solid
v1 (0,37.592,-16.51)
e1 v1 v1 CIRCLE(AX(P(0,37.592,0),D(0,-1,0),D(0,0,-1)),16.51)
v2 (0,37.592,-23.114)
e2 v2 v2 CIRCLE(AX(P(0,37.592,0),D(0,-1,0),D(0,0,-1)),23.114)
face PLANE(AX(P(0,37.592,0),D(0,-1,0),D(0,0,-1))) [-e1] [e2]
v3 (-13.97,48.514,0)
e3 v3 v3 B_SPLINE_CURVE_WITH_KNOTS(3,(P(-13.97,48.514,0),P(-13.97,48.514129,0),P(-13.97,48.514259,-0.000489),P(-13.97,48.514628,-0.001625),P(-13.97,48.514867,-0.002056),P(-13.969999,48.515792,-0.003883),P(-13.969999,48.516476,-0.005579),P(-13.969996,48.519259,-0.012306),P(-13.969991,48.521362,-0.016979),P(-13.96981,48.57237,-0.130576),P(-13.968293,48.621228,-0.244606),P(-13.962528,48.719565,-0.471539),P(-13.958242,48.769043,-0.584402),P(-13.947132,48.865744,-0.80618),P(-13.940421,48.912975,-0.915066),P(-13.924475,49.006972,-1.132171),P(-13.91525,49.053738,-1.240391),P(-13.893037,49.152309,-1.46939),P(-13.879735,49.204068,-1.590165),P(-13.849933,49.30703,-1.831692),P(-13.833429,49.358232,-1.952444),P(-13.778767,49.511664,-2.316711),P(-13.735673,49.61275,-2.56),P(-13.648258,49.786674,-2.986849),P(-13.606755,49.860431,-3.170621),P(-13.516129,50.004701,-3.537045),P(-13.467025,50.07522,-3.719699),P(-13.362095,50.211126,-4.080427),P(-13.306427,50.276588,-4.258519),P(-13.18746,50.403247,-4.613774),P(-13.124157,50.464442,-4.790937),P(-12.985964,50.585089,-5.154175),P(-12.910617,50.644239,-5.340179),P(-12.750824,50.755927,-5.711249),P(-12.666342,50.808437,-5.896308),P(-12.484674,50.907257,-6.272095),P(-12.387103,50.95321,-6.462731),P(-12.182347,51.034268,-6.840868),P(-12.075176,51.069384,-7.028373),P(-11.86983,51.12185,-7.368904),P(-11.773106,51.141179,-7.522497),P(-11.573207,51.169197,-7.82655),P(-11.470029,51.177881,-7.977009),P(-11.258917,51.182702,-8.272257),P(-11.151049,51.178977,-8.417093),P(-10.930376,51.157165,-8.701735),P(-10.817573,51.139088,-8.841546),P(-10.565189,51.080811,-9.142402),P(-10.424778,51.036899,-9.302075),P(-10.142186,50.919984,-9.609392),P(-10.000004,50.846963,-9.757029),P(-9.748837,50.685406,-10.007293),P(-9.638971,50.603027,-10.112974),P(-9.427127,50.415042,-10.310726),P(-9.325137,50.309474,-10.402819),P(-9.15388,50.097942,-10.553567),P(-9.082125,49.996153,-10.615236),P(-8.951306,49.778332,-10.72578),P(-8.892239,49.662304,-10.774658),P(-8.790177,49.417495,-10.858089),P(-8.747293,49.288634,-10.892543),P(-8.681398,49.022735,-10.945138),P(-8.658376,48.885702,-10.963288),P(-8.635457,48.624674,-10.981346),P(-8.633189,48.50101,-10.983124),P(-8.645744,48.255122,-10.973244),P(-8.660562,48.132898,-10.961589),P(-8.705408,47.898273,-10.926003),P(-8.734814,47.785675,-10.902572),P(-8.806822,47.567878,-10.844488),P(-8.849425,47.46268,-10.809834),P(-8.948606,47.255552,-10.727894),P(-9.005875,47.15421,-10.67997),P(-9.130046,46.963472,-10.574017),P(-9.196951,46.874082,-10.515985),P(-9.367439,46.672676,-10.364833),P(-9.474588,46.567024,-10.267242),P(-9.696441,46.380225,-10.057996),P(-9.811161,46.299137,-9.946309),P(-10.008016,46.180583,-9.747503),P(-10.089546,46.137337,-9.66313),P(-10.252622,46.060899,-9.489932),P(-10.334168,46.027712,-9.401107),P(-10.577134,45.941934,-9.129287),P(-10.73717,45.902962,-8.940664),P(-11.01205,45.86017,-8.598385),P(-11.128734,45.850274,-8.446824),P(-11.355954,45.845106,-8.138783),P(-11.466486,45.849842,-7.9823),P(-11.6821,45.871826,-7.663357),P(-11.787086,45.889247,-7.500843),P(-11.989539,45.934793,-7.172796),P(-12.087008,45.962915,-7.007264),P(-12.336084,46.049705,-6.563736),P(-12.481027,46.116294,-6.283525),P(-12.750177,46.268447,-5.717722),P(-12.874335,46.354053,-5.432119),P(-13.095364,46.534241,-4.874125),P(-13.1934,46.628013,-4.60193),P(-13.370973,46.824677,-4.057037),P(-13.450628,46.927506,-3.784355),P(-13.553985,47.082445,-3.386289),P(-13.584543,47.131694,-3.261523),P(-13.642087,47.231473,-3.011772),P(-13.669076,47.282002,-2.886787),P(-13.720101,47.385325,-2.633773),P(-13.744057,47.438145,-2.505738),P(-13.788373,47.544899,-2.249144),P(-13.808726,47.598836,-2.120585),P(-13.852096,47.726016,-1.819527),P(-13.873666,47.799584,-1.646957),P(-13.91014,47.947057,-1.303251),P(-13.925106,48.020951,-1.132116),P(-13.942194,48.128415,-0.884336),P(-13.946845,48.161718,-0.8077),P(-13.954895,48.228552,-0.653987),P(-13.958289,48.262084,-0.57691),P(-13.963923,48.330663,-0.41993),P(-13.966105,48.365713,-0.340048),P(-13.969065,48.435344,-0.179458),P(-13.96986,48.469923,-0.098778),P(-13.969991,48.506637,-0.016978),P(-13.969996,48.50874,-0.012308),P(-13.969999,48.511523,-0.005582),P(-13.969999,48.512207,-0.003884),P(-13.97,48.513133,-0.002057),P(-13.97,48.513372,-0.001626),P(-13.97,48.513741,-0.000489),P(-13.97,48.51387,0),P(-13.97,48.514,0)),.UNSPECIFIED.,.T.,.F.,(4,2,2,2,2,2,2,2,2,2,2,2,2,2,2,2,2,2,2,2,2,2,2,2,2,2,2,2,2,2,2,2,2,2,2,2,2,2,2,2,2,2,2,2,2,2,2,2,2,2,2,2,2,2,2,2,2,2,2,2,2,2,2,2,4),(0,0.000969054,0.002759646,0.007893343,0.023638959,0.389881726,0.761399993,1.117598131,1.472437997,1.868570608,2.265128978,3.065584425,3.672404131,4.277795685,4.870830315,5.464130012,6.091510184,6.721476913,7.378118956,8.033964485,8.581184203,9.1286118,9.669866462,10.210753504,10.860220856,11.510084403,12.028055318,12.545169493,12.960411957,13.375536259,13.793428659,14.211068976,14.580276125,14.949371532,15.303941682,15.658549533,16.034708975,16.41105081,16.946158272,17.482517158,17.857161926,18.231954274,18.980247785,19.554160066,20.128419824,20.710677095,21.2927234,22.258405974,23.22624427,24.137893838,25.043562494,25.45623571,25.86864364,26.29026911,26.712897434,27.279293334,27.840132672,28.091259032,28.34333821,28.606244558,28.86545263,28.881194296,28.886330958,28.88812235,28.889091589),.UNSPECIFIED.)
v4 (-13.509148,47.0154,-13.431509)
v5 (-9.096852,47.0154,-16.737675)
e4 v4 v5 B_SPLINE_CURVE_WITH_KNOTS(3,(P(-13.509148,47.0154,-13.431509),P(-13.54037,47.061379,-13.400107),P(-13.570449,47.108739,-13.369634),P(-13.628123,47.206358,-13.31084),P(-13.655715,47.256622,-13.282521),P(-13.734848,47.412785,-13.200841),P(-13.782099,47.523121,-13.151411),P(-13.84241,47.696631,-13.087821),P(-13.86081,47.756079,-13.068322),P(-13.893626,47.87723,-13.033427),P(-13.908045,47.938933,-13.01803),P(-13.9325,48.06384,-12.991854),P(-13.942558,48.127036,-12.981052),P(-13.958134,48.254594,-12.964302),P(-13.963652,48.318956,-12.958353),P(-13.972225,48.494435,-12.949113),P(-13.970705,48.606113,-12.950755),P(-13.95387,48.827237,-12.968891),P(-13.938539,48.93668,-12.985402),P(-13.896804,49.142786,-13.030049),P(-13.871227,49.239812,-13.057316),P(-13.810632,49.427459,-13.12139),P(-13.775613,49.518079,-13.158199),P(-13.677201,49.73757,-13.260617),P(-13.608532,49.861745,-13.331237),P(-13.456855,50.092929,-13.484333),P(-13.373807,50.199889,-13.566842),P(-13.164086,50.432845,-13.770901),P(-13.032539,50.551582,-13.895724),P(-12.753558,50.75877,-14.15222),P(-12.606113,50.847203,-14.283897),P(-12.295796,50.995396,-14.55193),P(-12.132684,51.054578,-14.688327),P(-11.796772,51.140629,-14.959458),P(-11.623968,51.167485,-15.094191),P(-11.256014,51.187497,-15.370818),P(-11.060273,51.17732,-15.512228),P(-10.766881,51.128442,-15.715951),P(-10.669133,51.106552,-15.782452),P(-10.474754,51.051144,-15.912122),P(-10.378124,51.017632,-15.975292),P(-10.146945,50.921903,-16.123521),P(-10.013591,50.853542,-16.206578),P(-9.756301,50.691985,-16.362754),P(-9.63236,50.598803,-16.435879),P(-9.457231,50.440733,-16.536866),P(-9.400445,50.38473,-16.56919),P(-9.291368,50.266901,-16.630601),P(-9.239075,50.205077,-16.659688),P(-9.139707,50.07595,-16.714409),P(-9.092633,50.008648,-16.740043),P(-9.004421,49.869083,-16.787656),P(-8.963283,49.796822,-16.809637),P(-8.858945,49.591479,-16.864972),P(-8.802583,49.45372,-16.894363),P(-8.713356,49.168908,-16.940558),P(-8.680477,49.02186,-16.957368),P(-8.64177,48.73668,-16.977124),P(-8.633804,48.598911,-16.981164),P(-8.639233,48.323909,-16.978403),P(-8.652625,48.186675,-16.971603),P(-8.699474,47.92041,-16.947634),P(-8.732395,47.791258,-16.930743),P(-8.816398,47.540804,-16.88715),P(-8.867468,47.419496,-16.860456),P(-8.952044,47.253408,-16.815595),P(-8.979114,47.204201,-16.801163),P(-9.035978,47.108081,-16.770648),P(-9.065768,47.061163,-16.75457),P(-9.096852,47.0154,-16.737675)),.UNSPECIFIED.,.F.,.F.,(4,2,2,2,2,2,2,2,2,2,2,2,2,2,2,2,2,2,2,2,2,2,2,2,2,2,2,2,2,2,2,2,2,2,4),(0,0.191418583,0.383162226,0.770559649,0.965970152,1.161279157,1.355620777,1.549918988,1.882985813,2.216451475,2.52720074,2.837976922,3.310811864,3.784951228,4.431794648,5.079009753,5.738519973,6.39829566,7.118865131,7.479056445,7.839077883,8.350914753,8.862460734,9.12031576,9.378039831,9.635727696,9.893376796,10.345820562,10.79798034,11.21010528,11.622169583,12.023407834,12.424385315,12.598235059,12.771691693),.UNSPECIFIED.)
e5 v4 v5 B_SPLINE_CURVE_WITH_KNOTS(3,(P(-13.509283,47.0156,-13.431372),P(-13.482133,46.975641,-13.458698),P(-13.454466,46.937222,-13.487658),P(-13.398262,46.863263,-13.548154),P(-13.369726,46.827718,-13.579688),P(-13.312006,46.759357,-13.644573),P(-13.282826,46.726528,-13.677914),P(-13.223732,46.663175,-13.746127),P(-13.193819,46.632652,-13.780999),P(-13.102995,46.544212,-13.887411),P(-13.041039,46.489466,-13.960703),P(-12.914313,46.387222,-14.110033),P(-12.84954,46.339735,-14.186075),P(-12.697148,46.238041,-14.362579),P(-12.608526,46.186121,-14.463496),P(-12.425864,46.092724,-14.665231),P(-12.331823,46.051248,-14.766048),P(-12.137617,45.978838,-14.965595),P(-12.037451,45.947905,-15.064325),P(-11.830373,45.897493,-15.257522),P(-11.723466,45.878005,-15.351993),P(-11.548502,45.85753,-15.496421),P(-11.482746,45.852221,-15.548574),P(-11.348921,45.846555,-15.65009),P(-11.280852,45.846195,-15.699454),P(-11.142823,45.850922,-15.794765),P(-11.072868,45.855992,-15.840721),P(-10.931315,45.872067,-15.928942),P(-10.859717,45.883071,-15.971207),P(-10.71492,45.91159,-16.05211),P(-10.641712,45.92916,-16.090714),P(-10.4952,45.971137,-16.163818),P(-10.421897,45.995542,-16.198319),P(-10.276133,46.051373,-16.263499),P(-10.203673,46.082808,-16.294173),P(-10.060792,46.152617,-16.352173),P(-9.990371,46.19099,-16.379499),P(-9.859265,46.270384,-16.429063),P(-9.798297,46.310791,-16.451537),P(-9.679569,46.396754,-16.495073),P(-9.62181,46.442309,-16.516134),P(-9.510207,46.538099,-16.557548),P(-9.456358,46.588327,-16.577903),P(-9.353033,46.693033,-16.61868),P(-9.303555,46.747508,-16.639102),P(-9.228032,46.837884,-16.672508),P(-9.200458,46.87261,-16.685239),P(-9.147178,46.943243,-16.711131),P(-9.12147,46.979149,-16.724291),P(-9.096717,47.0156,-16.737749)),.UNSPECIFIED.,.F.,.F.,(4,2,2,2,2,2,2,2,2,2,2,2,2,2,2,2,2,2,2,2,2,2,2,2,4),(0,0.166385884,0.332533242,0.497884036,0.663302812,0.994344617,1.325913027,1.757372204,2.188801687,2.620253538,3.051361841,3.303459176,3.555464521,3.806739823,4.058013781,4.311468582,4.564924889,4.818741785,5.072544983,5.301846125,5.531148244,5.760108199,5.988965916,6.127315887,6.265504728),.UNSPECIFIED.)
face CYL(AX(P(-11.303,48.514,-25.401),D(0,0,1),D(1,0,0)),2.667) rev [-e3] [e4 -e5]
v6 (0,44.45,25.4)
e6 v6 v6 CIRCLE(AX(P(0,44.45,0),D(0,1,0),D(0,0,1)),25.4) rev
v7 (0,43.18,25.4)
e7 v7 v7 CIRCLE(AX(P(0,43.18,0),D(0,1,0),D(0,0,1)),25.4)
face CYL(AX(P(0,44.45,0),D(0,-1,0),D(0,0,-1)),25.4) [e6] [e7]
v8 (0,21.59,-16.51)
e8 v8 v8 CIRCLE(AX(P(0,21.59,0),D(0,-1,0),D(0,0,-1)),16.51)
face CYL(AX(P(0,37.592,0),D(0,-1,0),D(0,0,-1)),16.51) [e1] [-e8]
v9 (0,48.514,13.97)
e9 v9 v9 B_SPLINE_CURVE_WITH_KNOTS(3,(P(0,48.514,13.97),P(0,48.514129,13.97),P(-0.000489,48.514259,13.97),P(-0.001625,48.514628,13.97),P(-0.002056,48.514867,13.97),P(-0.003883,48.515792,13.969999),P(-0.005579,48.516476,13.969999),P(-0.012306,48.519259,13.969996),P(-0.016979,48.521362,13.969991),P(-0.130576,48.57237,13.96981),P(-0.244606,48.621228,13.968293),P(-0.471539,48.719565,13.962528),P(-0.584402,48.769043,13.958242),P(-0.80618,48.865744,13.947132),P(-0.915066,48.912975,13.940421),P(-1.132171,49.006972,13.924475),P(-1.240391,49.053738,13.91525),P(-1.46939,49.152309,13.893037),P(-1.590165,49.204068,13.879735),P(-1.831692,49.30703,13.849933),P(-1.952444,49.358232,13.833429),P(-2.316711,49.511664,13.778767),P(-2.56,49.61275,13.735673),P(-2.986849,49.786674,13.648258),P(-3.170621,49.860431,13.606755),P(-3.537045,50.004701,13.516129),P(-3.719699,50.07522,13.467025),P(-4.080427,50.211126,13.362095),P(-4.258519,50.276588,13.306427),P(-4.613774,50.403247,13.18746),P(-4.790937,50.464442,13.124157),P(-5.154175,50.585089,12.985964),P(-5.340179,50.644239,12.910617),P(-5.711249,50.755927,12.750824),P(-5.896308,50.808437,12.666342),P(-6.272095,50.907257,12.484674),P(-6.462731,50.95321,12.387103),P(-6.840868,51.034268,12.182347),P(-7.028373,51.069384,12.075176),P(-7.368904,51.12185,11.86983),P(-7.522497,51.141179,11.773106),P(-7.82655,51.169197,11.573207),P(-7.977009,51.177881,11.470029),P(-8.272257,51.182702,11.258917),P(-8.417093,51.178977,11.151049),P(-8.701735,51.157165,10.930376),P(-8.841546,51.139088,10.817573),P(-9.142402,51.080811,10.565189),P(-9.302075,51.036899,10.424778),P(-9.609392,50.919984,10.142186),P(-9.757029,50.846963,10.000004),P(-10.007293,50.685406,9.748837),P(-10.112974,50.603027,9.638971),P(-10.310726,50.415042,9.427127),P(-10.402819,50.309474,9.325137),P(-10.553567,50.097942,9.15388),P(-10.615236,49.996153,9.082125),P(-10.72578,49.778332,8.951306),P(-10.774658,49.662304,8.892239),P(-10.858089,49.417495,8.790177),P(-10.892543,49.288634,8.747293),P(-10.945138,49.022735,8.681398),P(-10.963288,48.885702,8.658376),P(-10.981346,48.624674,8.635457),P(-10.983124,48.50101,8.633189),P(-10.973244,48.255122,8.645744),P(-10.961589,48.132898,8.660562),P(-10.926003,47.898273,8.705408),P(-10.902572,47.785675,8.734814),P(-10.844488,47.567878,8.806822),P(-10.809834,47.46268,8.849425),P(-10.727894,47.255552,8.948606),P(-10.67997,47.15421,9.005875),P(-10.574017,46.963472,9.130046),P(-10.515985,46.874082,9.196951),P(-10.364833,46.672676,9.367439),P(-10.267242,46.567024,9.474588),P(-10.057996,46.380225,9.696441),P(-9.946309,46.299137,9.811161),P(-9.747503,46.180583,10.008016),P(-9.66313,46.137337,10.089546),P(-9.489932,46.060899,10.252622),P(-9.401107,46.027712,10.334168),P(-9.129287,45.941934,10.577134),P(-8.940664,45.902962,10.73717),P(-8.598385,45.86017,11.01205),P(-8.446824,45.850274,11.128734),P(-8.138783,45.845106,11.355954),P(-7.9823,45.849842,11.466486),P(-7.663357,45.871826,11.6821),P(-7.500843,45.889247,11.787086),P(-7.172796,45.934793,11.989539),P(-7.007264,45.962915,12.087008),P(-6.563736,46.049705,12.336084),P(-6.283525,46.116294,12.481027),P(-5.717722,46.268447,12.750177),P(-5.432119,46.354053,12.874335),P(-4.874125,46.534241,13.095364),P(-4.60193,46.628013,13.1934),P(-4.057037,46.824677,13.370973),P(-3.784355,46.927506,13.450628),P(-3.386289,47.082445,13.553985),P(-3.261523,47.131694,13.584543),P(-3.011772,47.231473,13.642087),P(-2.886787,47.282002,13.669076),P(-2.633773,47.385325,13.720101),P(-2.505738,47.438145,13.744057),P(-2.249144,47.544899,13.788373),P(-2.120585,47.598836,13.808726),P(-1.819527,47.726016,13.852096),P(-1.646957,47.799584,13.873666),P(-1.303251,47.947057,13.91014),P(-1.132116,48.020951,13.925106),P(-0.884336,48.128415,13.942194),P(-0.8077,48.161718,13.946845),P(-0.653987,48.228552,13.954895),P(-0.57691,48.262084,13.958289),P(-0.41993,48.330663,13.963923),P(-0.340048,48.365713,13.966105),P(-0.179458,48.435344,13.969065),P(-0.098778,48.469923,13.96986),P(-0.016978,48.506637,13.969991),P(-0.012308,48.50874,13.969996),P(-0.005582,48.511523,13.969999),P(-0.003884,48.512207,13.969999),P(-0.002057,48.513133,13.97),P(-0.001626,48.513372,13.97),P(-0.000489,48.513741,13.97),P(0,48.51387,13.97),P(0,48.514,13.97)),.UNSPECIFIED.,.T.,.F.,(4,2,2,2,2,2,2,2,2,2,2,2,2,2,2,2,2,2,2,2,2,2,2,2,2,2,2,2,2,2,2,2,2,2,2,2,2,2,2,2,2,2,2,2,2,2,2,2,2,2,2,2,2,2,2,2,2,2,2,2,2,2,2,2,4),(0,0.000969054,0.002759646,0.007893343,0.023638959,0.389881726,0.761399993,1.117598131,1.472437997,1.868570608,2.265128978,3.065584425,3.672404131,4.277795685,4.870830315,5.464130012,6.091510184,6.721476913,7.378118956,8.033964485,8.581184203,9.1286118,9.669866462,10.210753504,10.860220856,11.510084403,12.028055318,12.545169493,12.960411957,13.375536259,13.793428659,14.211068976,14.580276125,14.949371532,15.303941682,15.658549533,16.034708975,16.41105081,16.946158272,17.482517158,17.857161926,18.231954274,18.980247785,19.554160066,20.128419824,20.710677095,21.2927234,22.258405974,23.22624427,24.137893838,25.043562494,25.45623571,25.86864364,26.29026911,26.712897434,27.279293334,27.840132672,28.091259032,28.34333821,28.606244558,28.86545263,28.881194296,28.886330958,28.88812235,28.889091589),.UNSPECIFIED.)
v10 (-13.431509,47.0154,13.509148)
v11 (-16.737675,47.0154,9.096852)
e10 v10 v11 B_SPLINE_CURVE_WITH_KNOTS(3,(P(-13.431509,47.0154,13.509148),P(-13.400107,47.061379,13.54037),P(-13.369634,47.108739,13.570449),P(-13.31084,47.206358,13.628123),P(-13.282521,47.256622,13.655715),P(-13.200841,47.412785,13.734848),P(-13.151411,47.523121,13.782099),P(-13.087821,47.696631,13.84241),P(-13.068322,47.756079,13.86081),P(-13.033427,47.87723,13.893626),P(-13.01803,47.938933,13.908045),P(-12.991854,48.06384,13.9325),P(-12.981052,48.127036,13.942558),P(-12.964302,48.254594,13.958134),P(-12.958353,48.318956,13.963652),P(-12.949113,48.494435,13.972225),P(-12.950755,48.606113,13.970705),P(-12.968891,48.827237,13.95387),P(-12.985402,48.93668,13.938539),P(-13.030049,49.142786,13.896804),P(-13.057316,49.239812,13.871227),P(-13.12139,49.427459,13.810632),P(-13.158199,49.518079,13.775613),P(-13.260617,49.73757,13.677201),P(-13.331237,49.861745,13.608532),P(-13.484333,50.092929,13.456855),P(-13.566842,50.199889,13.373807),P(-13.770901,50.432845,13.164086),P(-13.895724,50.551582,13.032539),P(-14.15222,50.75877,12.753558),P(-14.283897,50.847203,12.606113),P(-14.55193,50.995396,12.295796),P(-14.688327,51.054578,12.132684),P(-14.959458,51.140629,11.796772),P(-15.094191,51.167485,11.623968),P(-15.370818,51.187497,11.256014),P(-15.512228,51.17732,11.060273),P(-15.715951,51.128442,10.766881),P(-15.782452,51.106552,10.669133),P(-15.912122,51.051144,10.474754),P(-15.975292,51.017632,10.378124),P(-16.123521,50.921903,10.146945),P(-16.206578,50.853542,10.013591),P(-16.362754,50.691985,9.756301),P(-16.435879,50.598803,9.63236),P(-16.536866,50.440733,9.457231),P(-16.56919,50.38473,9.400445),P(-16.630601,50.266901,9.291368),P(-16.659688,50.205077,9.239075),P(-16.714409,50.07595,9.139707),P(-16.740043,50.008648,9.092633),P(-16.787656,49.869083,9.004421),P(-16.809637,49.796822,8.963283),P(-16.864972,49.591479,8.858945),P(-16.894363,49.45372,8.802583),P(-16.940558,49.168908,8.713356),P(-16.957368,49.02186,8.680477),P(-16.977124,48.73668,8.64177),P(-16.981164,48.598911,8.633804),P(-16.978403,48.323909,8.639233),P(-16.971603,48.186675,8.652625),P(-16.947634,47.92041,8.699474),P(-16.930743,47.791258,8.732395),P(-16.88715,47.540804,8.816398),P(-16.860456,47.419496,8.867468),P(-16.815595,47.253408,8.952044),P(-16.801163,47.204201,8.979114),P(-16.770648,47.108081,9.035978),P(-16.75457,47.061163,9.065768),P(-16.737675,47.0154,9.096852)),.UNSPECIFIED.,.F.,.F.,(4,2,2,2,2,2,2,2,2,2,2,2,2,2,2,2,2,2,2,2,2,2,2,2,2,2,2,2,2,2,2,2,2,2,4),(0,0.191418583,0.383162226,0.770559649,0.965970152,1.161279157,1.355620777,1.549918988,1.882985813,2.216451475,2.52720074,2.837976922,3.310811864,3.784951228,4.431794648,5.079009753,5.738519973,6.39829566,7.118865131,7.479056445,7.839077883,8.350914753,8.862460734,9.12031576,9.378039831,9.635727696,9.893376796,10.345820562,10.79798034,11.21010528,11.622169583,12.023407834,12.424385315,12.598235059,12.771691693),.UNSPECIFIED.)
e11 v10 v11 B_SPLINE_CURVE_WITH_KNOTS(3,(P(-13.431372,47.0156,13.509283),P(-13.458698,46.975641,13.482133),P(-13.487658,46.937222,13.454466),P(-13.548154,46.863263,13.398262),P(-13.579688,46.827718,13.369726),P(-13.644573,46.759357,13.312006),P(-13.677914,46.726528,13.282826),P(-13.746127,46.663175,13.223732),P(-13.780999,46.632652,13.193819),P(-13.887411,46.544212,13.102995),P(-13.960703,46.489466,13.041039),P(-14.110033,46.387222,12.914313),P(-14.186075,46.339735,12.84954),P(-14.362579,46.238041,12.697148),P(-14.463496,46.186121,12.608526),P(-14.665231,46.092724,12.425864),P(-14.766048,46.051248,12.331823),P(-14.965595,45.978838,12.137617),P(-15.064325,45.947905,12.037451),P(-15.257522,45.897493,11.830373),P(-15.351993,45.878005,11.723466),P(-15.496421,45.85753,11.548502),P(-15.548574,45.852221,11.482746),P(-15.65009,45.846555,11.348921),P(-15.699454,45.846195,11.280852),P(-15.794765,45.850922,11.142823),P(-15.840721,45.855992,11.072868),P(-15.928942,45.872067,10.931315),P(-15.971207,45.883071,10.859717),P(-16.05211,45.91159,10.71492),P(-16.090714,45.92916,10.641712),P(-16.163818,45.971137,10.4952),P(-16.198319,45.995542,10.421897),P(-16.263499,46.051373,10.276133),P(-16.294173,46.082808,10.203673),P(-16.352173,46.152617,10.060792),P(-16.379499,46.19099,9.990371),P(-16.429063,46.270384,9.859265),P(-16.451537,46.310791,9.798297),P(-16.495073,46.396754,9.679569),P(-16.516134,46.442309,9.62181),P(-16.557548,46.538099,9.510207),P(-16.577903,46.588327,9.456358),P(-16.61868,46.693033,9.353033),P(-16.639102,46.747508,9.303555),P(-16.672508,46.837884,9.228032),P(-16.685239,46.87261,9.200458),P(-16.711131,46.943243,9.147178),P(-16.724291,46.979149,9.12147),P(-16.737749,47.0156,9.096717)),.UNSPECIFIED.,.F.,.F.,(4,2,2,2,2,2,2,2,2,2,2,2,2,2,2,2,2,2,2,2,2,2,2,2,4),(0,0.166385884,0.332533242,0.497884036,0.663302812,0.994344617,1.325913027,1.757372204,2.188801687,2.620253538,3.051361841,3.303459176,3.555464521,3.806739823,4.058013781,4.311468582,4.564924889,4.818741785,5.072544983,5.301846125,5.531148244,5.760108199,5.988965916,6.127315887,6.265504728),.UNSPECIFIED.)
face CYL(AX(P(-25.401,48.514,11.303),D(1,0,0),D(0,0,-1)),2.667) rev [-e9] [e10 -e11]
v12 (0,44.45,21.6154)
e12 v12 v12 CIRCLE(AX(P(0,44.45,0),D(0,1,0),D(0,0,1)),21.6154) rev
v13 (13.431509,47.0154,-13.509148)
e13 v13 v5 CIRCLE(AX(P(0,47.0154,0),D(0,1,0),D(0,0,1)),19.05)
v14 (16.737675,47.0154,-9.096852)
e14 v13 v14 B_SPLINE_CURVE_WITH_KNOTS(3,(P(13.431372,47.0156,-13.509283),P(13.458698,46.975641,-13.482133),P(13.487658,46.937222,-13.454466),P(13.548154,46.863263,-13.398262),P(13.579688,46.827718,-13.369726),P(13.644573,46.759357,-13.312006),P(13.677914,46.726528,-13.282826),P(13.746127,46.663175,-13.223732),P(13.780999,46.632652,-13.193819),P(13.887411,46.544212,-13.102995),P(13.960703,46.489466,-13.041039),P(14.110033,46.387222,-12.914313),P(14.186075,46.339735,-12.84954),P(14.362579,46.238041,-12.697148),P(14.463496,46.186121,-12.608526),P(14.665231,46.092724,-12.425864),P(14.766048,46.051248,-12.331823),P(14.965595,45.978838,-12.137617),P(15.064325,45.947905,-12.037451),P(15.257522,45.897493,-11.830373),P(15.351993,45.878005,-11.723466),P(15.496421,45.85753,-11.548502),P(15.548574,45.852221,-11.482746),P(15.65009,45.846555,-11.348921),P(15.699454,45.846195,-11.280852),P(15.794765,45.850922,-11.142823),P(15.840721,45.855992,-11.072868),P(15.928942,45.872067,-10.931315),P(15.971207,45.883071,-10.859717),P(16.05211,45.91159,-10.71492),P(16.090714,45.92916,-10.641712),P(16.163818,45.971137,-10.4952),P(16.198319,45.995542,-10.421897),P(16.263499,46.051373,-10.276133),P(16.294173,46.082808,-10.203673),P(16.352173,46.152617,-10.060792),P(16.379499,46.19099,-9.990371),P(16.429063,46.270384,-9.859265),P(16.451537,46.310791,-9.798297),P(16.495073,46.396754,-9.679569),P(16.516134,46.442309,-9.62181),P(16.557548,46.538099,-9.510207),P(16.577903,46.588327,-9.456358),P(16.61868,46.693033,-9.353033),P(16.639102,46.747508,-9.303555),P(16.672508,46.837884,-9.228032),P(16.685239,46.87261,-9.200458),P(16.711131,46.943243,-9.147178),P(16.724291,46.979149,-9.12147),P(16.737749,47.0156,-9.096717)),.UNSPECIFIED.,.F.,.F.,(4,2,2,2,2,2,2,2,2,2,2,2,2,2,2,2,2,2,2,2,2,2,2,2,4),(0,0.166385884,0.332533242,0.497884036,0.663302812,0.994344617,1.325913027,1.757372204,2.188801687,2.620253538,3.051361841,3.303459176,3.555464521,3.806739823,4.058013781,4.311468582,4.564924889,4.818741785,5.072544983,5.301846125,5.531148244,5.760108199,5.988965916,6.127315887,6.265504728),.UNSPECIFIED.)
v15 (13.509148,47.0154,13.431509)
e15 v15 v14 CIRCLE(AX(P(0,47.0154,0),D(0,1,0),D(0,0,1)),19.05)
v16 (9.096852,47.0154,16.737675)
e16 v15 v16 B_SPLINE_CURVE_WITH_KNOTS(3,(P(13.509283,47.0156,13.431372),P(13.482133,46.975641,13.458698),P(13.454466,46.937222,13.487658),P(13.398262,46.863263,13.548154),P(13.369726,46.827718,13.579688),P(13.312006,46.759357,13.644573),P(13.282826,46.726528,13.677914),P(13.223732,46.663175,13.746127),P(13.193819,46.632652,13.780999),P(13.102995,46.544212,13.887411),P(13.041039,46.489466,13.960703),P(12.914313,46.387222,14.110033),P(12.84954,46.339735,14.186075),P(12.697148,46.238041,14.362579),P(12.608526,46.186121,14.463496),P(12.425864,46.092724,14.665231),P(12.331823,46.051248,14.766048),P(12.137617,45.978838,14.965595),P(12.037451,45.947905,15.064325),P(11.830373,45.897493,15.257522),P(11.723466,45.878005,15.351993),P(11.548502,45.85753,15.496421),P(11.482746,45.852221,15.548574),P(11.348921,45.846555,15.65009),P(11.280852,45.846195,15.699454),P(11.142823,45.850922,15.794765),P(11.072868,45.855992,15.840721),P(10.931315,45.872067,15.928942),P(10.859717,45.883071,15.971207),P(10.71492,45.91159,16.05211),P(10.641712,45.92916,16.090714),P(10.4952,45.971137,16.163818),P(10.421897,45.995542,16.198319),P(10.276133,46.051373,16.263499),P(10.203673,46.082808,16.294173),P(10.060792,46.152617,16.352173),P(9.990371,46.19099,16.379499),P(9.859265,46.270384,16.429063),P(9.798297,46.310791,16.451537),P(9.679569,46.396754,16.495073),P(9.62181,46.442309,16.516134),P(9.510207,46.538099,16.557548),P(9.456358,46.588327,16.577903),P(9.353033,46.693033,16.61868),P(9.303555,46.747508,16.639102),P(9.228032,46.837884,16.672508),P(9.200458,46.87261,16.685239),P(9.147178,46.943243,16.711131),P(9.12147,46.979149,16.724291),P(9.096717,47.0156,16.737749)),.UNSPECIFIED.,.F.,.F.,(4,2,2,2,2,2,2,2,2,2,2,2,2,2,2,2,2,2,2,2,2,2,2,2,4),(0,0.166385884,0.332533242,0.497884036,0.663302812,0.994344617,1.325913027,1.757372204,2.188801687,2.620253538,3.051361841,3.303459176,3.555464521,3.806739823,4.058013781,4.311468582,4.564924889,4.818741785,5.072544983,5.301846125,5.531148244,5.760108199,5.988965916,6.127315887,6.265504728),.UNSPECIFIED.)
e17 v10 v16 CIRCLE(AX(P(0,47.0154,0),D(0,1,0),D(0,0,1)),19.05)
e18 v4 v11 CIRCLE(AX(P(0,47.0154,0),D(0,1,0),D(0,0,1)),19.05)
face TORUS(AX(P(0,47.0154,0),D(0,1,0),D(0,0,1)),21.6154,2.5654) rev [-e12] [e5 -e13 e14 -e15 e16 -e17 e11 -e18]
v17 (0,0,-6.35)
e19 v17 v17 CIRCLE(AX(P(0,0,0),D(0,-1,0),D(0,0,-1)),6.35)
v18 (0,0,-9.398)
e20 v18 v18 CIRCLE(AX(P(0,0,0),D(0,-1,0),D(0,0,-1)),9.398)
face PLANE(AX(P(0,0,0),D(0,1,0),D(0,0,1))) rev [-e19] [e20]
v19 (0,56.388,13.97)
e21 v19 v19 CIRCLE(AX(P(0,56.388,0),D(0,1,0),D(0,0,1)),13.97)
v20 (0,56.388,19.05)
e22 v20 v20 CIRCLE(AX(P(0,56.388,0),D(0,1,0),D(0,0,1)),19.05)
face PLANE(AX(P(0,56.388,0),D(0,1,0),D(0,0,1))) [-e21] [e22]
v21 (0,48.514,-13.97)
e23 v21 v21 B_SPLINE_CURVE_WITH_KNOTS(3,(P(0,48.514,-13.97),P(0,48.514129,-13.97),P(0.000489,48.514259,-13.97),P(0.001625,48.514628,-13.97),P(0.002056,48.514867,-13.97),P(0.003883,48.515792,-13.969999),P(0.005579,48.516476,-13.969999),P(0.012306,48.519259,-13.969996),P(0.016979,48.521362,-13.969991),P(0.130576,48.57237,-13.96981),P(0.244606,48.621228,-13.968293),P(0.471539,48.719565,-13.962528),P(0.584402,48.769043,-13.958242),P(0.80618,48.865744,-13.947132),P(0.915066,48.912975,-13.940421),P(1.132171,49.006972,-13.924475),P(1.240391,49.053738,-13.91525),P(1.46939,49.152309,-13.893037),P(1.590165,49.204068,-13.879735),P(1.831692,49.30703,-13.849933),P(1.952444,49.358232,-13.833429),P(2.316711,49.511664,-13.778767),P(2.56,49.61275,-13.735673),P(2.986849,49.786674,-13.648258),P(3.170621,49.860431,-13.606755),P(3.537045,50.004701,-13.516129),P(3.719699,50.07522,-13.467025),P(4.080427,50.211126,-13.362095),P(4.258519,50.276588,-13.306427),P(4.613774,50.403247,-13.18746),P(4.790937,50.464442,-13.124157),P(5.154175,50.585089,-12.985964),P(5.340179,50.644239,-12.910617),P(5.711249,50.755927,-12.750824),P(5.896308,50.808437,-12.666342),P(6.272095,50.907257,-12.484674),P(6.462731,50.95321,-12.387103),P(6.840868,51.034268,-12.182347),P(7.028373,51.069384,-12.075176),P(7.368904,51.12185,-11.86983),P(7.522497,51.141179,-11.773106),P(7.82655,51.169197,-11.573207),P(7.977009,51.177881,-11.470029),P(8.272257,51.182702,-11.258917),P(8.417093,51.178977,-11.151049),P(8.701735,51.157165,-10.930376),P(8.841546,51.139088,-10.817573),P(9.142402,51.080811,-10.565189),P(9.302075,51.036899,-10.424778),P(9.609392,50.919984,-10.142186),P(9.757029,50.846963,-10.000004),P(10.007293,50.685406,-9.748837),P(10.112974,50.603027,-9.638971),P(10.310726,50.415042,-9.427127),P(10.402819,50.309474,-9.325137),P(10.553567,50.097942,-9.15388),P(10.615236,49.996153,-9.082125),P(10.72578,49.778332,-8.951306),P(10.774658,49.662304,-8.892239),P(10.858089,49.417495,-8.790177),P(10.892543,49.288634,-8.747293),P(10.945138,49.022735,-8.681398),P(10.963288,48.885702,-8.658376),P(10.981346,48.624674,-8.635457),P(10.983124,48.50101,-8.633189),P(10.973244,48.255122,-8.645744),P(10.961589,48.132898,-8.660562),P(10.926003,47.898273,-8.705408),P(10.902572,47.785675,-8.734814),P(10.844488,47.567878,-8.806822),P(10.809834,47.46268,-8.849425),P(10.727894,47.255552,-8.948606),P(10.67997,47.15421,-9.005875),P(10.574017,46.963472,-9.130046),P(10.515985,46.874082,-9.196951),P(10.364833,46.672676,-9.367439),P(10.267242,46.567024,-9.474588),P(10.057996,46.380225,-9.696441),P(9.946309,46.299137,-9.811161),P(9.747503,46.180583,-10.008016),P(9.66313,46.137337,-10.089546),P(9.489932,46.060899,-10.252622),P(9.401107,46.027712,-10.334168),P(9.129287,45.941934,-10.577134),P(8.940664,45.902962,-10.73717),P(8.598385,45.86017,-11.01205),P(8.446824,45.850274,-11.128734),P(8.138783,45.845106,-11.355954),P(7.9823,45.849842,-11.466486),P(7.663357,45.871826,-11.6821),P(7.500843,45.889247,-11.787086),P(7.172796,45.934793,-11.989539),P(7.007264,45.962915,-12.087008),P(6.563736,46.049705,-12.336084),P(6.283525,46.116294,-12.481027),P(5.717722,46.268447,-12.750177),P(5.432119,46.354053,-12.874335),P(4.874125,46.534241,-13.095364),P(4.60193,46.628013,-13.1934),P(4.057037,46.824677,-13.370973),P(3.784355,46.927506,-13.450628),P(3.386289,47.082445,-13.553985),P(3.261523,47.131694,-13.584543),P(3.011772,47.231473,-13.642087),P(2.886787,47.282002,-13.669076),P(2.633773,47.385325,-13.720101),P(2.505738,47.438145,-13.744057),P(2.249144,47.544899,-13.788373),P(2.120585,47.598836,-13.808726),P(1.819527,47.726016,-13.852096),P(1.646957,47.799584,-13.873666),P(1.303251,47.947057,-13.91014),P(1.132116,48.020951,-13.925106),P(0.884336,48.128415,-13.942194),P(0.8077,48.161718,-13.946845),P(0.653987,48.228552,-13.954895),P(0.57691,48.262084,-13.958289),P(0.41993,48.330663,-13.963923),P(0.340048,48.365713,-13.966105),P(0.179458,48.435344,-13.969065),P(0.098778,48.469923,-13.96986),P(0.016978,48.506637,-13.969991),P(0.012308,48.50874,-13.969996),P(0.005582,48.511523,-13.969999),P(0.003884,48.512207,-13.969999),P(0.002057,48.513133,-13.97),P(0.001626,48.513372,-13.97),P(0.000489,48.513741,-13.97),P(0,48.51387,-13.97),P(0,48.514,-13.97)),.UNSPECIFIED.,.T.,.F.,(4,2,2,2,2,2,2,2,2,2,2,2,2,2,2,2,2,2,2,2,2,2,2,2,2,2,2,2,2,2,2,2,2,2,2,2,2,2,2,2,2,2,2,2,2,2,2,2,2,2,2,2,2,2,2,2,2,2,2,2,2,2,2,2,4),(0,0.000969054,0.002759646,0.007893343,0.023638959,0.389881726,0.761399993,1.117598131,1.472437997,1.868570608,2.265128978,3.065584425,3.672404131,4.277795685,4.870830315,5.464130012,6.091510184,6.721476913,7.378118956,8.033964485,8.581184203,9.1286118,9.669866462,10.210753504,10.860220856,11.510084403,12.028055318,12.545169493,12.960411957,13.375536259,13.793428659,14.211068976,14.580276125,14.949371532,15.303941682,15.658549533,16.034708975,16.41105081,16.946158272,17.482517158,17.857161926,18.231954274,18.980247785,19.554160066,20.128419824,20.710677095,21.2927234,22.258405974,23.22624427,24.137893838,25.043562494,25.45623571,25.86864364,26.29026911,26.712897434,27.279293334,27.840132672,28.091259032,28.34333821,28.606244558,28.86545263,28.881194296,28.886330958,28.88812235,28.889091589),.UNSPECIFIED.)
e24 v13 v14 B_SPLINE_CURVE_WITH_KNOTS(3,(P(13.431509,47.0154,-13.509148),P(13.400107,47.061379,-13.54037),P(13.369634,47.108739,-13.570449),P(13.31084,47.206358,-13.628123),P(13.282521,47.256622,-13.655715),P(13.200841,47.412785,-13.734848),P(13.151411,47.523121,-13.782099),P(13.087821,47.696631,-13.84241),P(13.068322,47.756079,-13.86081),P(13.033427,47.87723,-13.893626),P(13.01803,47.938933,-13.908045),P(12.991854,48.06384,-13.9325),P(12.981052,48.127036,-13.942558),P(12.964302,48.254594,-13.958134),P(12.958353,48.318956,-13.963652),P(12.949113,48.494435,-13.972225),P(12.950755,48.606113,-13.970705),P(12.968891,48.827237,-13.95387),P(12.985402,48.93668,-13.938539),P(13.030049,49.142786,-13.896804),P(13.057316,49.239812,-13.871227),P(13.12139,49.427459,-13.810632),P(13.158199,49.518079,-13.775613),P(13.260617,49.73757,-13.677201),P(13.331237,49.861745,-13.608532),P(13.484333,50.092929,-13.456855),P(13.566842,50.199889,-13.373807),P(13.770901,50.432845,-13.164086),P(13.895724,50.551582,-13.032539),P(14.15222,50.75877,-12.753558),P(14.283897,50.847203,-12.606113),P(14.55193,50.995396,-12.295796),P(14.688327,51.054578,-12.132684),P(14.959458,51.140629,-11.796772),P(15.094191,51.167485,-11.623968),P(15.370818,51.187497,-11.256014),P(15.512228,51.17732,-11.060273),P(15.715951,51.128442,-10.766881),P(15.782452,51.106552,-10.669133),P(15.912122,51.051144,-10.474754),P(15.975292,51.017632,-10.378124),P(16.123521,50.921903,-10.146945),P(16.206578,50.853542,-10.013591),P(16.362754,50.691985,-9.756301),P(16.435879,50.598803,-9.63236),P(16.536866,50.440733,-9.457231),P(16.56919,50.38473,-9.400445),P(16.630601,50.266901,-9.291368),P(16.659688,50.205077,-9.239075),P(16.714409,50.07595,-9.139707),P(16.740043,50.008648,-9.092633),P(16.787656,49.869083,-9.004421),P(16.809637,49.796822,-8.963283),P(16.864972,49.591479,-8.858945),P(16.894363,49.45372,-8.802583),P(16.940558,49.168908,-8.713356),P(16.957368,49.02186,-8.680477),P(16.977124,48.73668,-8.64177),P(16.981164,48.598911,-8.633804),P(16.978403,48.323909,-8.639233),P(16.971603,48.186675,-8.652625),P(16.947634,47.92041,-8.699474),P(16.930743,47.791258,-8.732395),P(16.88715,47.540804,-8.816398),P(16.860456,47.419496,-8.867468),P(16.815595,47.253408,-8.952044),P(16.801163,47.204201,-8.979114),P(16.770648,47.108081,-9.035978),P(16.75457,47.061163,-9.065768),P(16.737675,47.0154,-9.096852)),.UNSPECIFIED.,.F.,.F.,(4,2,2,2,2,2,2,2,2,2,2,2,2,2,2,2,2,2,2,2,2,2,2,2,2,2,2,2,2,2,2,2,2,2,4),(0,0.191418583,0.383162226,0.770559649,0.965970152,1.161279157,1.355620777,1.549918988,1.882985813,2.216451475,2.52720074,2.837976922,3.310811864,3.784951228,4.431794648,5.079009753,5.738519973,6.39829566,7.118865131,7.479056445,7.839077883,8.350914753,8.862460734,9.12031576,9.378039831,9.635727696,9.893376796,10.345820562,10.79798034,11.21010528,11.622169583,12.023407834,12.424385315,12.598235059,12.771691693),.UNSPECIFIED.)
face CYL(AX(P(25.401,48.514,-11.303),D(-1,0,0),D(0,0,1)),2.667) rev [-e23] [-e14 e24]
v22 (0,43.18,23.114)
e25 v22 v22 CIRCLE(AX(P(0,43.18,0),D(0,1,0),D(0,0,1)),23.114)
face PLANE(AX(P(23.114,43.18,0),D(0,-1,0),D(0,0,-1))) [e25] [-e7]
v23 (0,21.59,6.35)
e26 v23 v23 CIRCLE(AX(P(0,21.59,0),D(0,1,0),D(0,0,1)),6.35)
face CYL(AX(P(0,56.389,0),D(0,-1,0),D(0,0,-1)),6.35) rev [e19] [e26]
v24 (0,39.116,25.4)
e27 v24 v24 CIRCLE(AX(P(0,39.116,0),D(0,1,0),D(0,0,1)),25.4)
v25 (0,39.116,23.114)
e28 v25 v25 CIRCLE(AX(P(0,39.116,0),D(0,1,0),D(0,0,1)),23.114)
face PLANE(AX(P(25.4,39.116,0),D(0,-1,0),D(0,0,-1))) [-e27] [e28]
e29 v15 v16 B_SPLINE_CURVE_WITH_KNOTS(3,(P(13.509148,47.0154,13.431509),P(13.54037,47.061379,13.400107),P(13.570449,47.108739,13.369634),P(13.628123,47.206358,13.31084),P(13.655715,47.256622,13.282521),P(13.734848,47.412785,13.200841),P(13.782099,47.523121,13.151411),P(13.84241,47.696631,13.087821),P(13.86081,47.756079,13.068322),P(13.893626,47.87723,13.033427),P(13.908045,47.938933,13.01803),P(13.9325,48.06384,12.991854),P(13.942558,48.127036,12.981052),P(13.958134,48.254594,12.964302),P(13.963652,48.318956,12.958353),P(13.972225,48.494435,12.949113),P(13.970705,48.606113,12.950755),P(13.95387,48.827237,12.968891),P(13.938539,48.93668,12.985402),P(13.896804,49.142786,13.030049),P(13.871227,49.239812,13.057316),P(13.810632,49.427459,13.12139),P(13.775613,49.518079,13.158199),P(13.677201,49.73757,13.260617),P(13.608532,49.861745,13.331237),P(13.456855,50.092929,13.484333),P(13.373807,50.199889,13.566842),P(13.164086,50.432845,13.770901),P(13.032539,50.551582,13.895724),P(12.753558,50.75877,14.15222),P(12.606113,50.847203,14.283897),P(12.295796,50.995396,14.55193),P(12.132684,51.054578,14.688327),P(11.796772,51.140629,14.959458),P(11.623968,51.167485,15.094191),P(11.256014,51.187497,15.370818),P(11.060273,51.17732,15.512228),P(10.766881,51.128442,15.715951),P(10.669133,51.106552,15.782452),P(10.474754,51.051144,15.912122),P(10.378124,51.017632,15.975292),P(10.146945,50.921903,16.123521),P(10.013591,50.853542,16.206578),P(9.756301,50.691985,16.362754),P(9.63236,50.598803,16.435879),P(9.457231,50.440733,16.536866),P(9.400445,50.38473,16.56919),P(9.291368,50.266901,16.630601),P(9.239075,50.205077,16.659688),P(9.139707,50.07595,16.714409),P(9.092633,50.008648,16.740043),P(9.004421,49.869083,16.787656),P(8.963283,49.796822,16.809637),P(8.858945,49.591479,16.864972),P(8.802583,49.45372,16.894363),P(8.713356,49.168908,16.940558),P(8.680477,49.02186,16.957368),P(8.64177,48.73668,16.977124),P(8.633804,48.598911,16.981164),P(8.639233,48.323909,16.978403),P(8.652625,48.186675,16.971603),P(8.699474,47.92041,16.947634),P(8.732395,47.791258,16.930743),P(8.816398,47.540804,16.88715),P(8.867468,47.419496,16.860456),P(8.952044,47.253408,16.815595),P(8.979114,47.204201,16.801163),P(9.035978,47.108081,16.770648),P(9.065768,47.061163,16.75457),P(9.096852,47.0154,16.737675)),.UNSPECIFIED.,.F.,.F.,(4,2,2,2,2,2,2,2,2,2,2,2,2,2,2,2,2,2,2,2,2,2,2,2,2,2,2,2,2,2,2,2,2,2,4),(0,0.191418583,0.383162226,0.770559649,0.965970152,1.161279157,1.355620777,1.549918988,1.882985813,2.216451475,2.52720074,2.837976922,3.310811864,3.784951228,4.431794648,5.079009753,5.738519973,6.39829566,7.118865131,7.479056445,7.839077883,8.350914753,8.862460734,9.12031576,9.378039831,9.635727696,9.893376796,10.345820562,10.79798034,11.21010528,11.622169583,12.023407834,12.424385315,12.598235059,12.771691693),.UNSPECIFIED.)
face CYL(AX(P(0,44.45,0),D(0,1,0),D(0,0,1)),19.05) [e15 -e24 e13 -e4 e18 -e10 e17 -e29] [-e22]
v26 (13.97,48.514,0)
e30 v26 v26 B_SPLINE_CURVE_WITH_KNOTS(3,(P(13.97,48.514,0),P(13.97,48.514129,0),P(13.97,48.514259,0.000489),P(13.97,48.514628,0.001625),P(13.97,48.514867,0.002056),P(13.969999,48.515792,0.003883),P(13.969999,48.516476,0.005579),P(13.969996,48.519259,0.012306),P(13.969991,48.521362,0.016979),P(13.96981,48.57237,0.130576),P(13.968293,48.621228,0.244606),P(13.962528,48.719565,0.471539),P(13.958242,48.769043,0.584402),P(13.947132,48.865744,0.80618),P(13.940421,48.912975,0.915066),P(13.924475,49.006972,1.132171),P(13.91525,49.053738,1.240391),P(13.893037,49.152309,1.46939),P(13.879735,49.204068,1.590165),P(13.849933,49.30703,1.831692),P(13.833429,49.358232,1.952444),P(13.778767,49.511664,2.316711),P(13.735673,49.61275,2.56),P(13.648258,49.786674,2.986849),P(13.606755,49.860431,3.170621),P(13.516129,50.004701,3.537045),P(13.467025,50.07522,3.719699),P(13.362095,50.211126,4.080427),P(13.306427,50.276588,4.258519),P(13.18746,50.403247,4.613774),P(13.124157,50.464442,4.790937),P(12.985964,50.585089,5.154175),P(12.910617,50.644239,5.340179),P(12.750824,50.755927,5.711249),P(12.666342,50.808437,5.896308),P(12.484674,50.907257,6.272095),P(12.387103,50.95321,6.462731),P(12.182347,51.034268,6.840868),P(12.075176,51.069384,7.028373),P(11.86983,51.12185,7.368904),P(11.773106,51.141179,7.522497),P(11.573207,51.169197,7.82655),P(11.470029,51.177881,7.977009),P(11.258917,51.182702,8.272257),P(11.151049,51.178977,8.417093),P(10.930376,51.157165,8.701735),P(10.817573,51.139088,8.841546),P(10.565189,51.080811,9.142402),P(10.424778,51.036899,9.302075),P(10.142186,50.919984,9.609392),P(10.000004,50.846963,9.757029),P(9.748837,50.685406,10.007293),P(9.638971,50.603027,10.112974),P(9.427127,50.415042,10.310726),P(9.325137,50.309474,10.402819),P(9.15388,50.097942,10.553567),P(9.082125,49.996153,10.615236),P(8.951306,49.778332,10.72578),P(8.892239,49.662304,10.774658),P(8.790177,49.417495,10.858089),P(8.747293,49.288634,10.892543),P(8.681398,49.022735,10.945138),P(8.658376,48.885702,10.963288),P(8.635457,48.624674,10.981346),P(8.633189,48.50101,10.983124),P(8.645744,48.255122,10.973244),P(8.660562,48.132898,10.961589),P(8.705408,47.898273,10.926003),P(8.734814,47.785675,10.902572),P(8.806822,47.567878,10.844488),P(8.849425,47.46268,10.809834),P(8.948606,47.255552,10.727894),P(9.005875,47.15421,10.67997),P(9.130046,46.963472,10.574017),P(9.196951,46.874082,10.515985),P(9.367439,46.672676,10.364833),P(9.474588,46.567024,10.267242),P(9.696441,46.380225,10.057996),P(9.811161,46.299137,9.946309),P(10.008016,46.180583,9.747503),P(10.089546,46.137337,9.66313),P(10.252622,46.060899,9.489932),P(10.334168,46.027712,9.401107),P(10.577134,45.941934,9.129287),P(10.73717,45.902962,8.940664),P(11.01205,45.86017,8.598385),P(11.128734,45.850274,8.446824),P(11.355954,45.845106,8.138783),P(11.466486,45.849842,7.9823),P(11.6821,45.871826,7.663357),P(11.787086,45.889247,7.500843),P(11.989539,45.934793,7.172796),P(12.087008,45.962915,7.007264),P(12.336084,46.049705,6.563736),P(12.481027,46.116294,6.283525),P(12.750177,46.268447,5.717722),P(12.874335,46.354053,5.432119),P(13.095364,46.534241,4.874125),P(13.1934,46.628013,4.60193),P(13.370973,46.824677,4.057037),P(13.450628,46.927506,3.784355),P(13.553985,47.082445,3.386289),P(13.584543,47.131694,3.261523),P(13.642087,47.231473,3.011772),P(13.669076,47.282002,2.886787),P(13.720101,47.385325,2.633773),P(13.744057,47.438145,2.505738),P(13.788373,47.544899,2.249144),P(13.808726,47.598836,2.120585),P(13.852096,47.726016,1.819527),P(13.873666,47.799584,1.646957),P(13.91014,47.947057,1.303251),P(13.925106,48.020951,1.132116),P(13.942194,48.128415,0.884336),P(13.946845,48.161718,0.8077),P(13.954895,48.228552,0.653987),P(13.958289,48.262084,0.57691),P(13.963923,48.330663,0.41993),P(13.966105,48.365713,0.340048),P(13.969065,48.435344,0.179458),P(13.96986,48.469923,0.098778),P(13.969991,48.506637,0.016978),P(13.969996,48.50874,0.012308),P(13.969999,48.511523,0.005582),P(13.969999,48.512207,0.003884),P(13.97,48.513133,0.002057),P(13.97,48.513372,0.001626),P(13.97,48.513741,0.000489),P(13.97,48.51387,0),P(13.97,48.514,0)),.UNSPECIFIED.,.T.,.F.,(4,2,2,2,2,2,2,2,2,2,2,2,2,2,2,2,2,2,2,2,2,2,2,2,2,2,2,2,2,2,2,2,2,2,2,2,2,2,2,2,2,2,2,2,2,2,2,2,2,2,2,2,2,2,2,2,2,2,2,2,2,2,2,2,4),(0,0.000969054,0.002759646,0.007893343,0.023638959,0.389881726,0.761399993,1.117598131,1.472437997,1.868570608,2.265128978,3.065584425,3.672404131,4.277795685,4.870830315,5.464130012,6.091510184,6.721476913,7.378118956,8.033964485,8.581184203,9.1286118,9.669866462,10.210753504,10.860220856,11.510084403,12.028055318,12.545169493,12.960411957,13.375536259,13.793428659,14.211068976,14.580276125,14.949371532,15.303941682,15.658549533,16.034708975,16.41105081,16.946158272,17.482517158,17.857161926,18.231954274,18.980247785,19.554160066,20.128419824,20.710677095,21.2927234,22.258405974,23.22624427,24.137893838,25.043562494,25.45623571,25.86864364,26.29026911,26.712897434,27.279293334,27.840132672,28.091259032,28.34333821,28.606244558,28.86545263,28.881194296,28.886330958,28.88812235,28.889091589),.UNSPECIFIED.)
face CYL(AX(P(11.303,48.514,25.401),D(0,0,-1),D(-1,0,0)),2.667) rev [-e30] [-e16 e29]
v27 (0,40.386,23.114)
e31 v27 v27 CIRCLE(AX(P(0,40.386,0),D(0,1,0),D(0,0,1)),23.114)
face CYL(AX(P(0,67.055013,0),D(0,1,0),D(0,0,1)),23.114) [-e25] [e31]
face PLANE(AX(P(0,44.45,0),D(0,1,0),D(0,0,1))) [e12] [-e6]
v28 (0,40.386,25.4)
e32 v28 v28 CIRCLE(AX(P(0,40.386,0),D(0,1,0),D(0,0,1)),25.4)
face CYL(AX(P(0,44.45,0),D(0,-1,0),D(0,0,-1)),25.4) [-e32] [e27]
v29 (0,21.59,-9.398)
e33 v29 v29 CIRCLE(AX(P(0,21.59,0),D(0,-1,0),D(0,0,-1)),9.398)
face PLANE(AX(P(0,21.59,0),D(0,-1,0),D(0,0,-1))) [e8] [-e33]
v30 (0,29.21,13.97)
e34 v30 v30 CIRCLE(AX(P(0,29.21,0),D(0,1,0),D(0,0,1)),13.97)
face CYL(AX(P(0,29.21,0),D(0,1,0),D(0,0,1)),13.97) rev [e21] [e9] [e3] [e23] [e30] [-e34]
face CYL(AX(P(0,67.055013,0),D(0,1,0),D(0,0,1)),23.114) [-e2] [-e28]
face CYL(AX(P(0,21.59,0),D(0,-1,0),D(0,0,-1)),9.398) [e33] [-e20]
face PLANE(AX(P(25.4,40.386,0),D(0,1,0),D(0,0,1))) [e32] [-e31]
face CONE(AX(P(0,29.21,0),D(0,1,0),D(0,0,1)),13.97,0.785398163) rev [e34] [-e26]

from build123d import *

# Parameters (mm, degrees)
SKETCH1_R                = 32.385
STEEL_CYLINDER_DEPTH     = 56.388
SKETCH3_R                = 32.385
SKETCH3_R_2              = 25.4
BOTTOM_CUT_BIG_DEPTH     = 44.45
SKETCH2_R                = 25.4
SKETCH2_R_2              = 9.398
BOTTOM_CUT_STEM_DEPTH    = 21.59
TOP_START                = -11.938
SKETCH4_R                = 32.385
SKETCH4_R_2              = 19.05
TOP_CUT_DEPTH            = 11.938
STEM_INNER_REACH         = 68.858
SKETCH5_R                = 6.35
SKETCH6_R                = 13.97
TOP_INNER_DEPTH          = 27.178
SKETCH7_W                = 2.286
SKETCH7_H                = 2.794
TOP_FILLET_R             = 2.5654
SKETCH8_W                = 2.286
SKETCH8_H                = 17.526
INTLET_HOLE_REACH        = 68.858
SKETCH10_R               = 2.667
INLET_PATTERN_COUNT      = 4
INNER_CHAMFER_SIZE       = 7.62
SKETCH11_R               = 23.114
SKETCH11_R_2             = 16.51
MIDDLE_OUTER_CUT_2_DEPTH = 16.002


with BuildPart() as part:
    # Sketch1 → Steel Cylinder (new body)
    with BuildSketch(Plane(origin=(0, 0, 0), x_dir=(1, 0, 0), z_dir=(0, 1, 0))):
        with Locations(Location((0, 0, 0), (0, 0, 270))):
            Circle(SKETCH1_R)
    extrude(amount=STEEL_CYLINDER_DEPTH)

    # Sketch3 → Bottom Cut Big (cut)
    with BuildSketch(Plane.XZ):
        with Locations(Location((0, 0, 0), (0, 0, 270))):
            Circle(SKETCH3_R)
        with Locations(Location((0, 0, 0), (0, 0, 270))):
            Circle(SKETCH3_R_2, mode=Mode.SUBTRACT)
    extrude(amount=-BOTTOM_CUT_BIG_DEPTH, mode=Mode.SUBTRACT)

    # Sketch2 → Bottom Cut Stem (cut)
    with BuildSketch(Plane.XZ):
        with Locations(Location((0, 0, 0), (0, 0, 270))):
            Circle(SKETCH2_R)
        with Locations(Location((0, 0, 0), (0, 0, 270))):
            Circle(SKETCH2_R_2, mode=Mode.SUBTRACT)
    extrude(amount=-BOTTOM_CUT_STEM_DEPTH, mode=Mode.SUBTRACT)

    # Sketch4 → Top Cut (cut)
    with BuildSketch(Plane(origin=(0, 56.388, 0), x_dir=(1, 0, 0), z_dir=(0, 1, 0)).offset(TOP_START)):
        Circle(SKETCH4_R)
        with Locations(Location((0, 0, 0), (0, 0, 270))):
            Circle(SKETCH4_R_2, mode=Mode.SUBTRACT)
    extrude(amount=TOP_CUT_DEPTH, mode=Mode.SUBTRACT)

    # Sketch5 → Stem Inner (cut, up to next)
    with BuildSketch(Plane.XZ, mode=Mode.PRIVATE) as stem_inner_sk1:
        with Locations(Location((0, 0, 0), (0, 0, 270))):
            Circle(SKETCH5_R)
    stem_inner_tool1 = extrude(stem_inner_sk1.sketch, amount=-STEM_INNER_REACH, mode=Mode.PRIVATE) & part.part
    add(stem_inner_tool1.solids().sort_by_distance((0, 0, 0))[0], mode=Mode.SUBTRACT)

    # Sketch6 → Top Inner (cut)
    with BuildSketch(Plane(origin=(0, 56.388, 0), x_dir=(1, 0, 0), z_dir=(0, 1, 0))):
        with Locations(Location((0, 0, 0), (0, 0, 270))):
            Circle(SKETCH6_R)
    extrude(amount=-TOP_INNER_DEPTH, mode=Mode.SUBTRACT)

    # Sketch7 → O Ring (revolve, cut)
    with BuildSketch(Plane.XY, mode=Mode.PRIVATE) as o_ring_sk:
        with Locations((24.257, 41.783)):
            Rectangle(SKETCH7_W, SKETCH7_H)
    revolve(o_ring_sk.sketch.rotate(Axis((0, 67.055012984, 0), (0, -1, 0)), 90), axis=Axis((0, 67.055012984, 0), (0, -1, 0)), mode=Mode.SUBTRACT)

    # Top Fillet
    top_fillet_edges = [part.edges().sort_by_distance(p)[0] for p in [
        (0, 44.45, -19.05),
    ]]
    fillet(top_fillet_edges, radius=TOP_FILLET_R)

    # Sketch8 → Based O Ring Cut (revolve, cut)
    with BuildSketch(Plane.XY, mode=Mode.PRIVATE) as based_o_ring_cut_sk:
        with Locations((24.257, 30.353)):
            Rectangle(SKETCH8_W, SKETCH8_H)
    revolve(based_o_ring_cut_sk.sketch.rotate(Axis((0, 67.055012984, 0), (0, -1, 0)), 90), axis=Axis((0, 67.055012984, 0), (0, -1, 0)), mode=Mode.SUBTRACT)

    # Sketch10 → Intlet Hole (cut, up to next)
    with BuildSketch(Plane.XY, mode=Mode.PRIVATE) as intlet_hole_sk1:
        with Locations(Location((11.303, 48.514, 0), (0, 0, 214.187627302))):
            Circle(SKETCH10_R)
    intlet_hole_tool1 = extrude(intlet_hole_sk1.sketch, amount=INTLET_HOLE_REACH, mode=Mode.PRIVATE) & part.part
    intlet_hole = intlet_hole_tool1.solids().sort_by_distance((11.303, 48.514, 0))[0]
    add(intlet_hole, mode=Mode.SUBTRACT)

    # Inlet Pattern: Intlet Hole ×4 about axis
    inlet_pattern_axis = Axis((0, 67.055012984, 0), (0, -1, 0))
    for i in range(1, INLET_PATTERN_COUNT):
        add(intlet_hole.rotate(inlet_pattern_axis, i * 360 / INLET_PATTERN_COUNT), mode=Mode.SUBTRACT)

    # Inner Chamfer
    inner_chamfer_edges = [part.edges().sort_by_distance(p)[0] for p in [
        (0, 29.21, 6.35),
    ]]
    chamfer(inner_chamfer_edges, length=INNER_CHAMFER_SIZE - 0.0001)  # a hair under: the kernel refuses the full size

    # Sketch11 → Middle Outer Cut 2 (cut)
    with BuildSketch(Plane.XZ.offset(-21.59)):
        with Locations(Location((0, 0, 0), (0, 0, 90))):
            Circle(SKETCH11_R)
        with Locations(Location((0, 0, 0), (0, 0, 270))):
            Circle(SKETCH11_R_2, mode=Mode.SUBTRACT)
    extrude(amount=-MIDDLE_OUTER_CUT_2_DEPTH, mode=Mode.SUBTRACT)


solid = part.part
